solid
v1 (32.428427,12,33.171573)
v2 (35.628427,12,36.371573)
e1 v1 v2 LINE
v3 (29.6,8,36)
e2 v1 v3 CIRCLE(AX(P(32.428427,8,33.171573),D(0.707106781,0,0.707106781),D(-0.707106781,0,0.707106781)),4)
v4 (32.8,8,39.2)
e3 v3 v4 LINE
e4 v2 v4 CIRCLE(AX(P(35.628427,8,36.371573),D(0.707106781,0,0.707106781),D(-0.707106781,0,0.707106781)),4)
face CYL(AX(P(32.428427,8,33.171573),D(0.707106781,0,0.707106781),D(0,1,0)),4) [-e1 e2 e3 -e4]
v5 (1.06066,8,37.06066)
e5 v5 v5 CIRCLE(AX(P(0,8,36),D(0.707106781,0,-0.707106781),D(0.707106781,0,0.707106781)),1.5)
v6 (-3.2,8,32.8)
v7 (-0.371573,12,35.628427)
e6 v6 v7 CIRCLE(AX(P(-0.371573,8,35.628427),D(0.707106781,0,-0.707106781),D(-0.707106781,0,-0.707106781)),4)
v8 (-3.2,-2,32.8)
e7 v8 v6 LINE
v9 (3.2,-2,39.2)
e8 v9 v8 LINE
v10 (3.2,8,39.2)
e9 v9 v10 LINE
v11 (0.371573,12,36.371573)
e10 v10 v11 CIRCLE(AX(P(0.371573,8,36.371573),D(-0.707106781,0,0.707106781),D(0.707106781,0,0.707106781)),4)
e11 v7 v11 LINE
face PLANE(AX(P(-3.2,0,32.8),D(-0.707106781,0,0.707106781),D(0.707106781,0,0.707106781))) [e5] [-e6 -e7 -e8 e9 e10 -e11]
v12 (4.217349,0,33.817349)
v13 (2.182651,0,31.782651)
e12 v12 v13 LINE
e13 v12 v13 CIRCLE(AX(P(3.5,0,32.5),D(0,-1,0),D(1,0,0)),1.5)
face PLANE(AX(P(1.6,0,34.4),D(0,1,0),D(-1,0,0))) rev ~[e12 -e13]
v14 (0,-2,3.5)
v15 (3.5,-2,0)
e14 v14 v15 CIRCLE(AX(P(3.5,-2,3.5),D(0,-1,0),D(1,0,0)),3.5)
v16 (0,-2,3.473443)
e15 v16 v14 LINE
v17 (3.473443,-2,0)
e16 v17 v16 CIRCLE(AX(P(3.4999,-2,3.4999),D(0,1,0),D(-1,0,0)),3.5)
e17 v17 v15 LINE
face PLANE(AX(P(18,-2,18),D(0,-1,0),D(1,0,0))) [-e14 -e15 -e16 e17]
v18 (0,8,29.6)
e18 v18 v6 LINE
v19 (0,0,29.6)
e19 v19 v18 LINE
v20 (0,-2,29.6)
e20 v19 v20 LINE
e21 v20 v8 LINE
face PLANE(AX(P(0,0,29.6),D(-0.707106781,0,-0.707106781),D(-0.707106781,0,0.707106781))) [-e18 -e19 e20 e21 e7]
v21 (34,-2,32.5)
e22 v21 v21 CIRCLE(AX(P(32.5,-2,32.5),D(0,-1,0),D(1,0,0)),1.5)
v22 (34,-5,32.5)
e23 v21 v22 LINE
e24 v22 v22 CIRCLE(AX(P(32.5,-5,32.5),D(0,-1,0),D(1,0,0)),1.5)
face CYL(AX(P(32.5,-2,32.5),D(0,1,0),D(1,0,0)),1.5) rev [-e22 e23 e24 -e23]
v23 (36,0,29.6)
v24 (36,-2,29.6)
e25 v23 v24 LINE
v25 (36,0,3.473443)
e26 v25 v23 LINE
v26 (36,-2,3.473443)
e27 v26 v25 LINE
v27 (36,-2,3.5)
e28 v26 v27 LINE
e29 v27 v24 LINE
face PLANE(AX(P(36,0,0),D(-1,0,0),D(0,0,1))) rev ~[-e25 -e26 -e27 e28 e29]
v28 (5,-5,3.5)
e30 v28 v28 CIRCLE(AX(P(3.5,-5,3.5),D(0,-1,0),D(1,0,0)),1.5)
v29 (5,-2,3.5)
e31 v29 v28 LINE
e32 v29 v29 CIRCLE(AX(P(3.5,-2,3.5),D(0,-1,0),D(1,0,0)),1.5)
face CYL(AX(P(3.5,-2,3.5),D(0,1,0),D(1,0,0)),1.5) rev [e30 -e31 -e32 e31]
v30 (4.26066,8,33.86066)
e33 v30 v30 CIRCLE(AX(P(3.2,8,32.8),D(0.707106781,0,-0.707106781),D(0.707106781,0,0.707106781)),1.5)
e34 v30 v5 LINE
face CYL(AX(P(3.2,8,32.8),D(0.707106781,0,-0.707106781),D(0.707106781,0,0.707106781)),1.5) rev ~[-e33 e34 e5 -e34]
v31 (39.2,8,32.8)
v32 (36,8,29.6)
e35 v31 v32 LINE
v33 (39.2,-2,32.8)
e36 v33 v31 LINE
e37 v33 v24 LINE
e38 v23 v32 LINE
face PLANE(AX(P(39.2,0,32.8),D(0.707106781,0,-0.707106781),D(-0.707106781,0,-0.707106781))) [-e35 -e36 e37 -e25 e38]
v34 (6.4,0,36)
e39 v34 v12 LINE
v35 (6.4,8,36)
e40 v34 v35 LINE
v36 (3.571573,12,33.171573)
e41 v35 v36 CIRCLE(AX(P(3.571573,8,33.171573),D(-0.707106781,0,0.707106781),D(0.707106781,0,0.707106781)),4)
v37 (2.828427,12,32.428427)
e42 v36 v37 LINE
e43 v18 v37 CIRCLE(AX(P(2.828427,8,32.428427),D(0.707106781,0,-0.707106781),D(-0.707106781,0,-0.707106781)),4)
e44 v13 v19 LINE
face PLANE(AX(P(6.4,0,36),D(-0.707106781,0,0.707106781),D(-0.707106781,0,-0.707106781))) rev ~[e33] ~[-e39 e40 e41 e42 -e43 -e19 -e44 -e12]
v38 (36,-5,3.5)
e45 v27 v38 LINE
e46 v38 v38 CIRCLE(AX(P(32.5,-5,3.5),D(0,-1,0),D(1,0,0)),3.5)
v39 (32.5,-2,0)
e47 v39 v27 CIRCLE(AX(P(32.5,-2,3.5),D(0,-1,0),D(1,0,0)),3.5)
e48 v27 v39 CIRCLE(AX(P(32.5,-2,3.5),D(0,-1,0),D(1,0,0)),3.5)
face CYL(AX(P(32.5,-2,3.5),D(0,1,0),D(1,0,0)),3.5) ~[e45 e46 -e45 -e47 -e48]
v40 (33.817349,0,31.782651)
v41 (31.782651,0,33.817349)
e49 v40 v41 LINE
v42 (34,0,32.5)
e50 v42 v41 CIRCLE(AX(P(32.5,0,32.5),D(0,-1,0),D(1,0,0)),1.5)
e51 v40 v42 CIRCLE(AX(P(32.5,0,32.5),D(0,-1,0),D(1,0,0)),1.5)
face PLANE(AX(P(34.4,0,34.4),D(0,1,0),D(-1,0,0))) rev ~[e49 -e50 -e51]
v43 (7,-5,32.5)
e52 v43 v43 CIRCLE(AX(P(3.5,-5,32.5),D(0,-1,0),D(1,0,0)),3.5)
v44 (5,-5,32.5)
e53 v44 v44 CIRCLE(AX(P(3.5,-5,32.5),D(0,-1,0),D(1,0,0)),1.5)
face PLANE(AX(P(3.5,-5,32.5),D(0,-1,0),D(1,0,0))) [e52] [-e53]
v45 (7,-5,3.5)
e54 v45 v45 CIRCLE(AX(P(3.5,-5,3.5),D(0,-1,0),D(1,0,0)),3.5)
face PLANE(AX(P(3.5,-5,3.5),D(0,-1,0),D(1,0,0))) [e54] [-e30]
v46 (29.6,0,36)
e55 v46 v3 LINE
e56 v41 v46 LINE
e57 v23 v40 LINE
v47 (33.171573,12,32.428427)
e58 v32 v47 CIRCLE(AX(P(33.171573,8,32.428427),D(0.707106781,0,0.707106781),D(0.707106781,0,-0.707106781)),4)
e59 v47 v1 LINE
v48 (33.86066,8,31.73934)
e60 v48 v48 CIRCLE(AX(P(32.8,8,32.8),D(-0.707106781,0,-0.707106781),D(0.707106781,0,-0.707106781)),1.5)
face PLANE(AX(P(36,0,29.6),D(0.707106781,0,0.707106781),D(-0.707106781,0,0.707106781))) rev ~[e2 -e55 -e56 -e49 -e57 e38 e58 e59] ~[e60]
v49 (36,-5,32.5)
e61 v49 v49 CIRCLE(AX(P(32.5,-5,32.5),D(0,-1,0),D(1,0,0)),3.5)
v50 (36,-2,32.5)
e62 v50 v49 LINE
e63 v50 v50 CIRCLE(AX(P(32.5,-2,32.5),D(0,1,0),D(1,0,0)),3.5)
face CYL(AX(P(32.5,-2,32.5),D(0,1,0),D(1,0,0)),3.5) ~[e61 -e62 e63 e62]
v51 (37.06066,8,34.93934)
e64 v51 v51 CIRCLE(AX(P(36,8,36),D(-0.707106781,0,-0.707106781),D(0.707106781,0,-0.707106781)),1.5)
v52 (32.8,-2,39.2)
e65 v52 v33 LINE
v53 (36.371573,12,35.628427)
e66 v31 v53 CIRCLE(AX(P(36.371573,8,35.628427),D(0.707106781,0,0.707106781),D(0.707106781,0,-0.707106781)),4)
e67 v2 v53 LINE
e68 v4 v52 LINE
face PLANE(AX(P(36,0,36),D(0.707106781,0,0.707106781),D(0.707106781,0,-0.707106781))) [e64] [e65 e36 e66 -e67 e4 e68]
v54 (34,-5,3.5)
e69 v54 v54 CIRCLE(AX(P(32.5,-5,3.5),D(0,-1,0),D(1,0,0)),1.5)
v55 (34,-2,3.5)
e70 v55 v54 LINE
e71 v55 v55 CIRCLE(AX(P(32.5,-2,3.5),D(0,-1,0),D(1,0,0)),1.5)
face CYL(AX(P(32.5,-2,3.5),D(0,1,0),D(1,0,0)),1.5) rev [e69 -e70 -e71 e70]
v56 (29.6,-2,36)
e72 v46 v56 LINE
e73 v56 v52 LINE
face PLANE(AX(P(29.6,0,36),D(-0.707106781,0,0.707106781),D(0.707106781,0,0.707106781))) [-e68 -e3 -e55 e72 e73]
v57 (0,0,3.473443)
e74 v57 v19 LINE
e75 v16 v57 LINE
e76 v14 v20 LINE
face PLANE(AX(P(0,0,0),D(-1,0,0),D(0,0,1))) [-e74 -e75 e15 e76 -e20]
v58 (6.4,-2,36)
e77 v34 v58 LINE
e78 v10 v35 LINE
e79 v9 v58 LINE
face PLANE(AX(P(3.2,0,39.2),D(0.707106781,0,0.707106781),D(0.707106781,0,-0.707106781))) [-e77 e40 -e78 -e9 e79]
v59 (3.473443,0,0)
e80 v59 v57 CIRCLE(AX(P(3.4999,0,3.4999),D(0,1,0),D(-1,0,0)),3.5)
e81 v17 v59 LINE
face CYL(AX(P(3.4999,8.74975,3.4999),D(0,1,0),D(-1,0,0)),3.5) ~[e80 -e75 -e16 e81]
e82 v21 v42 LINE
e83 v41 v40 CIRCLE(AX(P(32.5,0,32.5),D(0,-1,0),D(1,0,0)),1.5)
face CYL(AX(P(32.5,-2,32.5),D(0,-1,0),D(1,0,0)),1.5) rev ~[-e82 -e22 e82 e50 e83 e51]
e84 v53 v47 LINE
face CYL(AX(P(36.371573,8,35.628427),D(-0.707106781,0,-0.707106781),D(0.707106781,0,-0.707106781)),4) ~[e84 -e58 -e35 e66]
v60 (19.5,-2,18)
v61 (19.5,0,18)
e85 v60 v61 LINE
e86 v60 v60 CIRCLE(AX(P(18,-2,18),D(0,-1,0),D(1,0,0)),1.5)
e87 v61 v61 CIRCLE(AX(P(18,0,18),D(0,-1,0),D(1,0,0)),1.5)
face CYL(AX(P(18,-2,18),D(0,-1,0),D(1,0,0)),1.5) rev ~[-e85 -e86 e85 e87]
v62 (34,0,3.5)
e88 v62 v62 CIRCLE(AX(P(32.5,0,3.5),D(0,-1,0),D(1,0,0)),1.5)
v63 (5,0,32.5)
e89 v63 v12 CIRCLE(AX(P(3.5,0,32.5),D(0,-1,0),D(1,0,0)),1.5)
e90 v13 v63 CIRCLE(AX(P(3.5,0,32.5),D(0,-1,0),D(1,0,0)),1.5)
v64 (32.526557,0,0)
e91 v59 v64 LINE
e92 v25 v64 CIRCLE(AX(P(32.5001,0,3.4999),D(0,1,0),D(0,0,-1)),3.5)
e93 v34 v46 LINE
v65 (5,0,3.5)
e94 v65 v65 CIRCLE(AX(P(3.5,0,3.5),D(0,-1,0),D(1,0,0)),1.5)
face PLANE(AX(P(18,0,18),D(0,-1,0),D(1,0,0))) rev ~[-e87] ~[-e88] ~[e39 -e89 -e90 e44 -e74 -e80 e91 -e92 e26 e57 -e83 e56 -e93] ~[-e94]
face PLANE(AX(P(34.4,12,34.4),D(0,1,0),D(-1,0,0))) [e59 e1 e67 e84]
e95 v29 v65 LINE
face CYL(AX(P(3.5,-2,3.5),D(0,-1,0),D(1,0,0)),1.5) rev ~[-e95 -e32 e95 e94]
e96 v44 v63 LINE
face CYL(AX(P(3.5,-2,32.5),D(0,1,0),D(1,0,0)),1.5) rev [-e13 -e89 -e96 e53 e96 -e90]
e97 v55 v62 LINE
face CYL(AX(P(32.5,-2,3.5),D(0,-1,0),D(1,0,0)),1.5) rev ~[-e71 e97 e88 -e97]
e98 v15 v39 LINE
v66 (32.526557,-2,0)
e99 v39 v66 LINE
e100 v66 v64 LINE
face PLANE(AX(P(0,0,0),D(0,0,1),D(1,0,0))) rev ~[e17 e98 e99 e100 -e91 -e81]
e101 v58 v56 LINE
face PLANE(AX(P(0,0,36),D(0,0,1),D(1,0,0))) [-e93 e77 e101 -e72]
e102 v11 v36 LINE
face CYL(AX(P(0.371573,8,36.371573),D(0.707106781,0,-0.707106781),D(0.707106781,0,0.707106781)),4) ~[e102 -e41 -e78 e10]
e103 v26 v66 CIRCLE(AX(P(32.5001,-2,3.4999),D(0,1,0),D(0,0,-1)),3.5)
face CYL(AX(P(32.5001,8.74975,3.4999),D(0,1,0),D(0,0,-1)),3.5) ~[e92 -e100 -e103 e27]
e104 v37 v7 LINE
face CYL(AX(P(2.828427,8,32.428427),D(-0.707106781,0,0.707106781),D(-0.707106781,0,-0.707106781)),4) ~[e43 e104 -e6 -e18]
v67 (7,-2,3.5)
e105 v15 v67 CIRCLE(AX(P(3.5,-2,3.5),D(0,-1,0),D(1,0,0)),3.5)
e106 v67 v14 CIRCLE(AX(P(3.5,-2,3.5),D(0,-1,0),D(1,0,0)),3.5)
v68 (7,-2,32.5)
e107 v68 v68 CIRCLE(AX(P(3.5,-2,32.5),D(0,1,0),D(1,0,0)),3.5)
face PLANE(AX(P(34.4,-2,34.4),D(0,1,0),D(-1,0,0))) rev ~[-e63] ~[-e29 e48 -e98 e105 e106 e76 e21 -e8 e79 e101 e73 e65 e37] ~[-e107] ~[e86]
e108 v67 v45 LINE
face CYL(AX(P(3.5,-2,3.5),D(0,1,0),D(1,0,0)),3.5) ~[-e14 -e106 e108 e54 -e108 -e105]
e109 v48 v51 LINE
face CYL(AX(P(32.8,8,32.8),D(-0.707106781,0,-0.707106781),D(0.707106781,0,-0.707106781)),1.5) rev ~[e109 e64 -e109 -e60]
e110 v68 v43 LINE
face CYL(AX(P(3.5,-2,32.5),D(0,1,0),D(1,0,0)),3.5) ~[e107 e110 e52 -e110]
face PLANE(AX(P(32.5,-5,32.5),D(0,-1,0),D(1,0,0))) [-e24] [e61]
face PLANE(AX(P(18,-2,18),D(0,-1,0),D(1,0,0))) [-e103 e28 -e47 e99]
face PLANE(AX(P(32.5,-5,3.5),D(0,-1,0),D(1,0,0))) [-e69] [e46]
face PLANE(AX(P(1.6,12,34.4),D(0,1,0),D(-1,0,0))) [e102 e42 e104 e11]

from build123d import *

# Parameters (mm, degrees)
F0_W         = 36
F0_H         = 36
F1_DEPTH     = 2
F2_R         = 3.5
F2_R_2       = 1.5
F3_DEPTH     = 3
F3_FACE_R    = 1.5
F4_R         = 1.5
F5_DEPTH     = 2
F7_DEPTH     = 12
F9_DEPTH     = 2
F10_R        = 1.5
F11_DEPTH    = 4.5254833996
F12_R        = 1.5
F13_DEPTH    = 4.5254833996
F14_R        = 4
F15_T1_DEPTH = 19.4995000071


# Not quite as in the source:
# - a fillet or chamfer that OpenCascade refuses, or shapes differently, is made with other operations: its cross-section is extruded or revolved along the edge and cut away or added


with BuildPart() as f1:
    # F0 (on Front) → F1 (new body)
    with BuildSketch(Plane.XZ):
        with Locations((18, 18)):
            Rectangle(F0_W, F0_H)
    extrude(amount=F1_DEPTH)

    # F2 (on face) → F3 (join)
    with BuildSketch(Plane.XZ.offset(2)):
        with Locations((3.5, 32.5)):
            Circle(F2_R)
        with Locations((3.5, 32.5)):
            Circle(F2_R_2, mode=Mode.SUBTRACT)
        with Locations((32.5, 32.5)):
            Circle(F2_R)
        with Locations((32.5, 32.5)):
            Circle(F2_R_2, mode=Mode.SUBTRACT)
        with Locations((32.5, 3.5)):
            Circle(F2_R)
        with Locations((32.5, 3.5)):
            Circle(F2_R_2, mode=Mode.SUBTRACT)
        with Locations((3.5, 3.5)):
            Circle(F2_R)
        with Locations((3.5, 3.5)):
            Circle(F2_R_2, mode=Mode.SUBTRACT)
    extrude(amount=F3_DEPTH)

    # F3_face (on face) + F4 (on face) → F5 (cut, through all)
    with BuildSketch(Plane(origin=(18, -2, 18), x_dir=(1, 0, 0), z_dir=(0, -1, 0))):
        with Locations((-14.5, 14.5)):
            Circle(F3_FACE_R)
        with Locations((-14.5, -14.5)):
            Circle(F3_FACE_R)
        with Locations((14.5, -14.5)):
            Circle(F3_FACE_R)
        with Locations((14.5, 14.5)):
            Circle(F3_FACE_R)
    with BuildSketch(Plane.XZ.offset(2)):
        with Locations((18, 18)):
            Circle(F4_R)
    extrude(amount=-F5_DEPTH, mode=Mode.SUBTRACT)

    # F6 (on face) → F7 (join)
    with BuildSketch(Plane(origin=(0, 0, 0), x_dir=(-1, 0, 0), z_dir=(0, 1, 0))):
        Polygon((-39.2, 32.8), (-36, 29.6), (-29.6, 36), (-32.8, 39.2), align=None)
        Polygon((-6.4, 36), (0, 29.6), (3.2, 32.8), (-3.2, 39.2), align=None)
    extrude(amount=F7_DEPTH)

    # F9 (add, through all): faces of the model
    f9_faces = [f1.faces().sort_by_distance(p)[0] for p in [
        (37.0666666667, 0, 32.8),
        (32.8, 0, 37.0666666667),
        (3.2, 0, 37.0666666667),
        (-1.0666666667, 0, 32.8),
    ]]
    extrude(f9_faces, amount=F9_DEPTH)

    # F10 (on face) → F11 (cut, through all)
    with BuildSketch(Plane(origin=(32.8, 0, 32.8), x_dir=(0.7071067812, 0, -0.7071067812), z_dir=(-0.7071067812, 0, -0.7071067812))):
        with Locations((0, -8)):
            Circle(F10_R)
    extrude(amount=-F11_DEPTH, mode=Mode.SUBTRACT)

    # F12 (on face) → F13 (cut, through all)
    with BuildSketch(Plane(origin=(-14.8, 0, 14.8), x_dir=(0.7071067812, 0, 0.7071067812), z_dir=(0.7071067812, 0, -0.7071067812))):
        with Locations((25.4558441227, -8)):
            Circle(F12_R)
    extrude(amount=-F13_DEPTH, mode=Mode.SUBTRACT)

    # F14
    f14_edges = [f1.edges().sort_by_distance(p)[0] for p in [
        (-1.6, 12, 31.2),
        (4.8, 12, 37.6),
        (31.2, 12, 37.6),
        (37.6, 12, 31.2),
    ]]
    fillet(f14_edges, radius=F14_R)

    # F15: fillet of radius 3.5 on 2 edges, made by hand

    # F15_s2 → F15_t1 (cut)
    with BuildSketch(Plane.XZ.offset(-8.7497500036)):
        with BuildLine():
            ThreePointArc((-0.0001, 3.4999), (1.0250262658, 1.0250262658), (3.4999, -0.0001))
            Line((3.4999, -0.0001), (3.4999, -0.0701))
            ThreePointArc((3.4999, -0.0701), (1.74995, -0.07), (0, -0.07))
            Line((0, -0.07), (-0.07, 0))
            ThreePointArc((-0.07, 0), (-0.07, 1.74995), (-0.0701, 3.4999))
            Line((-0.0701, 3.4999), (-0.0001, 3.4999))
        make_face()
        with BuildLine():
            ThreePointArc((32.5001, -0.0001), (34.9749737342, 1.0250262658), (36.0001, 3.4999))
            Line((36.0001, 3.4999), (36.0701, 3.4999))
            ThreePointArc((36.0701, 3.4999), (36.07, 1.74995), (36.07, 0))
            Line((36.07, 0), (36, -0.07))
            ThreePointArc((36, -0.07), (34.25005, -0.07), (32.5001, -0.0701))
            Line((32.5001, -0.0701), (32.5001, -0.0001))
        make_face()
    extrude(amount=F15_T1_DEPTH, mode=Mode.SUBTRACT)


solid = f1.part
